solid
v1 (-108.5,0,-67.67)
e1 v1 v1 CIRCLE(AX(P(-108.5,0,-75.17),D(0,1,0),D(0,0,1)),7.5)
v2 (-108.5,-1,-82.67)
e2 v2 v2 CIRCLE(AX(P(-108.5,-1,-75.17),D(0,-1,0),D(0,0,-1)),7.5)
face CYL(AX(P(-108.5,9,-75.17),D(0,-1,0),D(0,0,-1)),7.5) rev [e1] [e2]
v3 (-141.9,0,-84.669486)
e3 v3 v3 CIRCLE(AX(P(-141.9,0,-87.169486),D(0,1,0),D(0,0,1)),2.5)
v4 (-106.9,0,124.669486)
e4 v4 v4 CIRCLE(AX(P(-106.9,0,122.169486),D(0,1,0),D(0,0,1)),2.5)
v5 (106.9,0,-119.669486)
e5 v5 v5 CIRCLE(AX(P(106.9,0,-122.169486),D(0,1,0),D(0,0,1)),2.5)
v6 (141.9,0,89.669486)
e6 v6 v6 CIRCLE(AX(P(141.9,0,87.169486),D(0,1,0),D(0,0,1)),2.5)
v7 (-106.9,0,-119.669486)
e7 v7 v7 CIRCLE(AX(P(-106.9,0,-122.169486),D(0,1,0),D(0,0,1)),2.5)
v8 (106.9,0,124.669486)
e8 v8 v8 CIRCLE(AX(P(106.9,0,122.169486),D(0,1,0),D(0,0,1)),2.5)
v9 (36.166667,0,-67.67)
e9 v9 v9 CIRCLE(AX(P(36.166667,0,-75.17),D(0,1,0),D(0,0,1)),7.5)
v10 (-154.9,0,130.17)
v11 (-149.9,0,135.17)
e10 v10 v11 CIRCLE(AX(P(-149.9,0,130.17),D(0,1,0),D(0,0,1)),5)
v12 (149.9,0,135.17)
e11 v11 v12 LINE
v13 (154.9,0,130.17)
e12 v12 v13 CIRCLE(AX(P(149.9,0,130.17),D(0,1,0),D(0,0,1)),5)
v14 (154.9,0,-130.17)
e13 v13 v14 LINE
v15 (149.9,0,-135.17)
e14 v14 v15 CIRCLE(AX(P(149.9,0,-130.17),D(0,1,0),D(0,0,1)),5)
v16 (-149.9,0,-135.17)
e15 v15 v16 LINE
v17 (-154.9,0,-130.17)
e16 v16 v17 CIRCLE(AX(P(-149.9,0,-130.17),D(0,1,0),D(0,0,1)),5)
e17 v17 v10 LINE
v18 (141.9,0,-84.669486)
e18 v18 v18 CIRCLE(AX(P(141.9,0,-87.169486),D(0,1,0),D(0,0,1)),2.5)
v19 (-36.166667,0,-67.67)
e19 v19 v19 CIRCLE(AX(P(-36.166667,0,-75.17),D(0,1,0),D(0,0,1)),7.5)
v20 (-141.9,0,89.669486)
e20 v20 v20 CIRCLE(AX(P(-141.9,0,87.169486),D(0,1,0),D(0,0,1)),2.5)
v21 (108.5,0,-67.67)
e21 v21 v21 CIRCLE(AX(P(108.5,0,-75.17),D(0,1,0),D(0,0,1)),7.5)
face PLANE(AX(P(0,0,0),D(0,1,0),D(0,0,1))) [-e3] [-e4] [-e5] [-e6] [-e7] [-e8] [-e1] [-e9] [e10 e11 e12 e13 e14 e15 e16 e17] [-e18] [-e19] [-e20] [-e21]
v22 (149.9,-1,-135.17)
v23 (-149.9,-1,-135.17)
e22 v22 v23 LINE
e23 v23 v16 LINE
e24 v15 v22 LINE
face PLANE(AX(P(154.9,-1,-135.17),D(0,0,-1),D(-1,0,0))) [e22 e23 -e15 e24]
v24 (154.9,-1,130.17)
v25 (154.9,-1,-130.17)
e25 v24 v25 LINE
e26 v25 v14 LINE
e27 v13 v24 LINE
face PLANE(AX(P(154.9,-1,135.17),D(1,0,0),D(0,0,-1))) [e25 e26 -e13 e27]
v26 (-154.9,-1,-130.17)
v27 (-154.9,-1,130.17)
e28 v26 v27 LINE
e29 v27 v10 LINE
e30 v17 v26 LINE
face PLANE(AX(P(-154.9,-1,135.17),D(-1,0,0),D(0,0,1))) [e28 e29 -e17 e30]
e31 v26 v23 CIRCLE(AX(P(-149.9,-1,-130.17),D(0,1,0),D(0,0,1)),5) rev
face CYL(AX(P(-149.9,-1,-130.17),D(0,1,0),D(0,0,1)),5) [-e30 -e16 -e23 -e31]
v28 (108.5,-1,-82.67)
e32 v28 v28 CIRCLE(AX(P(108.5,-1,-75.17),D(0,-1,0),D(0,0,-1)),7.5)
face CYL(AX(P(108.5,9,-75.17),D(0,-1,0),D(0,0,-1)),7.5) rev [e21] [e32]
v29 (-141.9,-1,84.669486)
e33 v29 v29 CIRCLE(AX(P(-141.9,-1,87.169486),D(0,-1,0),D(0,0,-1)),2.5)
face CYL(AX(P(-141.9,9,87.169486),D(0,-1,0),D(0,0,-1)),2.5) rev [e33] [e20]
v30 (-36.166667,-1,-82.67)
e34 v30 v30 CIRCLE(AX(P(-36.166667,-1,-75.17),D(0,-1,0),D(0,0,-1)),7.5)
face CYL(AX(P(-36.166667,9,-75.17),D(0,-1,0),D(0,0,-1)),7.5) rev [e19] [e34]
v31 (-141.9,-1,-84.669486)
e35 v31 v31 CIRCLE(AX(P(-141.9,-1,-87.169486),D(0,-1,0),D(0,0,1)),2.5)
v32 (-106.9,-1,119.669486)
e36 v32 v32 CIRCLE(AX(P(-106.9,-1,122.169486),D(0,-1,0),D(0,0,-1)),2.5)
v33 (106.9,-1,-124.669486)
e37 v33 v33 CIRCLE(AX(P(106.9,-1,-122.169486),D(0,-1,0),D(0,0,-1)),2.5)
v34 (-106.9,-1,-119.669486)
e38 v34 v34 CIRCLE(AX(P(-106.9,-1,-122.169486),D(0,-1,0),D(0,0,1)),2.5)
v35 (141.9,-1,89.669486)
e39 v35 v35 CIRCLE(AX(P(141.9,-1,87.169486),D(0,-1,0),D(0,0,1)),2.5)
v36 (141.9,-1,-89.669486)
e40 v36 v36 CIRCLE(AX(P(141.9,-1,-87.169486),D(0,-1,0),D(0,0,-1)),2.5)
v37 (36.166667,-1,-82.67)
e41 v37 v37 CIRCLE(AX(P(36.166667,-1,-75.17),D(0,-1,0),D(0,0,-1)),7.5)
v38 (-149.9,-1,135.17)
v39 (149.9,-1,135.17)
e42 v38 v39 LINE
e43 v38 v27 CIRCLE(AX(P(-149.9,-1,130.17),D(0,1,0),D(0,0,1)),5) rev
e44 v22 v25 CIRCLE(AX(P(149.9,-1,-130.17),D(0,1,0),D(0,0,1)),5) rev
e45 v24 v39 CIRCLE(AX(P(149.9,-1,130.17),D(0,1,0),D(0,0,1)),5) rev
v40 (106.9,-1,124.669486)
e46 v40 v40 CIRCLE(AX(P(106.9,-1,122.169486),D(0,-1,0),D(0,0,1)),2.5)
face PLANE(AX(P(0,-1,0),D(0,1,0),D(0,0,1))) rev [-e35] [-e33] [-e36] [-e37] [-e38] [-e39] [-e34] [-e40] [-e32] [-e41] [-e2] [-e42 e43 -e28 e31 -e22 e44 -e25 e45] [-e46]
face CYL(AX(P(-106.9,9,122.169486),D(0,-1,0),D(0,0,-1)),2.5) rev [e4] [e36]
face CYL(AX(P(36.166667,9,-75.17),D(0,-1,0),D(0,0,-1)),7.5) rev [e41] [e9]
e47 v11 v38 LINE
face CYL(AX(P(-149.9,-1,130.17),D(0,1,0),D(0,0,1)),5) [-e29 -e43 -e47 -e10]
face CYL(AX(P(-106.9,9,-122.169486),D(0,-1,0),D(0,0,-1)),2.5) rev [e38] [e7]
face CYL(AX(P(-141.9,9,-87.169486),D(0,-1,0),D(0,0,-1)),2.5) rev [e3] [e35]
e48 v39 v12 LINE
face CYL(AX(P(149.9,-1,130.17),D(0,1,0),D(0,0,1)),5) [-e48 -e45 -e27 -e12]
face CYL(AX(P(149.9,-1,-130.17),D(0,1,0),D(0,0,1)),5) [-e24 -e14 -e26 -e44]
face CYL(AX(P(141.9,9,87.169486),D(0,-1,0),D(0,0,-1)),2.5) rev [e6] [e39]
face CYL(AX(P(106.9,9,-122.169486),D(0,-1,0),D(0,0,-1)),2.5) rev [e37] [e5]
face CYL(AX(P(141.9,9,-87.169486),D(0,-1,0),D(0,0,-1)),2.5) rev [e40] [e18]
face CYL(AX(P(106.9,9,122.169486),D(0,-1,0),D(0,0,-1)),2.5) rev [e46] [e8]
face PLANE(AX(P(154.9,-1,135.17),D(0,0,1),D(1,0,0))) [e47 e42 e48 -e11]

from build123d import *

# Parameters (mm, degrees)
SKETCH1_W          = 309.8
SKETCH1_H          = 270.34
BASE_FLANGE1_DEPTH = 1
FILLET1_R          = 5
SKETCH2_R          = 2.5
CUT_EXTRUDE1_DEPTH = 10
SKETCH4_R          = 7.5
CUT_EXTRUDE2_DEPTH = 10


# Sheet-metal steps are written as plain solids
with BuildPart() as part:
    # Sketch1 → Base-Flange1 (new body)
    with BuildSketch(Plane(origin=(0, 0, 0), x_dir=(1, 0, 0), z_dir=(0, 1, 0))):
        Rectangle(SKETCH1_W, SKETCH1_H)
    extrude(amount=-BASE_FLANGE1_DEPTH)

    # Fillet1
    fillet1_edges = [part.edges().sort_by_distance(p)[0] for p in [
        (-154.9, -0.5, -135.17),
        (154.9, -0.5, -135.17),
        (154.9, -0.5, 135.17),
        (-154.9, -0.5, 135.17),
    ]]
    fillet(fillet1_edges, radius=FILLET1_R)

    # Sketch2 → Cut-Extrude1 (cut)
    with BuildSketch(Plane.XZ.offset(1)):
        with Locations(Location((-141.9, 87.169485818, 0), (0, 0, 270))):
            Circle(SKETCH2_R)
        with Locations(Location((-106.9, 122.169485818, 0), (0, 0, 270))):
            Circle(SKETCH2_R)
        with Locations(Location((141.9, 87.169485818, 0), (0, 0, 90))):
            Circle(SKETCH2_R)
        with Locations(Location((106.9, 122.169485818, 0), (0, 0, 90))):
            Circle(SKETCH2_R)
        with Locations(Location((141.9, -87.169485818, 0), (0, 0, 270))):
            Circle(SKETCH2_R)
        with Locations(Location((106.9, -122.169485818, 0), (0, 0, 270))):
            Circle(SKETCH2_R)
        with Locations(Location((-141.9, -87.169485818, 0), (0, 0, 90))):
            Circle(SKETCH2_R)
        with Locations(Location((-106.9, -122.169485818, 0), (0, 0, 90))):
            Circle(SKETCH2_R)
    extrude(amount=-CUT_EXTRUDE1_DEPTH, mode=Mode.SUBTRACT)

    # Sketch4 → Cut-Extrude2 (cut)
    with BuildSketch(Plane(origin=(0, -1, 0), x_dir=(-1, 0, 0), z_dir=(0, -1, 0))):
        with Locations(Location((108.5, 75.17, 0), (0, 0, 90))):
            Circle(SKETCH4_R)
        with Locations(Location((36.166666667, 75.17, 0), (0, 0, 90))):
            Circle(SKETCH4_R)
        with Locations(Location((-36.166666667, 75.17, 0), (0, 0, 90))):
            Circle(SKETCH4_R)
        with Locations(Location((-108.5, 75.17, 0), (0, 0, 90))):
            Circle(SKETCH4_R)
    extrude(amount=-CUT_EXTRUDE2_DEPTH, mode=Mode.SUBTRACT)


solid = part.part
